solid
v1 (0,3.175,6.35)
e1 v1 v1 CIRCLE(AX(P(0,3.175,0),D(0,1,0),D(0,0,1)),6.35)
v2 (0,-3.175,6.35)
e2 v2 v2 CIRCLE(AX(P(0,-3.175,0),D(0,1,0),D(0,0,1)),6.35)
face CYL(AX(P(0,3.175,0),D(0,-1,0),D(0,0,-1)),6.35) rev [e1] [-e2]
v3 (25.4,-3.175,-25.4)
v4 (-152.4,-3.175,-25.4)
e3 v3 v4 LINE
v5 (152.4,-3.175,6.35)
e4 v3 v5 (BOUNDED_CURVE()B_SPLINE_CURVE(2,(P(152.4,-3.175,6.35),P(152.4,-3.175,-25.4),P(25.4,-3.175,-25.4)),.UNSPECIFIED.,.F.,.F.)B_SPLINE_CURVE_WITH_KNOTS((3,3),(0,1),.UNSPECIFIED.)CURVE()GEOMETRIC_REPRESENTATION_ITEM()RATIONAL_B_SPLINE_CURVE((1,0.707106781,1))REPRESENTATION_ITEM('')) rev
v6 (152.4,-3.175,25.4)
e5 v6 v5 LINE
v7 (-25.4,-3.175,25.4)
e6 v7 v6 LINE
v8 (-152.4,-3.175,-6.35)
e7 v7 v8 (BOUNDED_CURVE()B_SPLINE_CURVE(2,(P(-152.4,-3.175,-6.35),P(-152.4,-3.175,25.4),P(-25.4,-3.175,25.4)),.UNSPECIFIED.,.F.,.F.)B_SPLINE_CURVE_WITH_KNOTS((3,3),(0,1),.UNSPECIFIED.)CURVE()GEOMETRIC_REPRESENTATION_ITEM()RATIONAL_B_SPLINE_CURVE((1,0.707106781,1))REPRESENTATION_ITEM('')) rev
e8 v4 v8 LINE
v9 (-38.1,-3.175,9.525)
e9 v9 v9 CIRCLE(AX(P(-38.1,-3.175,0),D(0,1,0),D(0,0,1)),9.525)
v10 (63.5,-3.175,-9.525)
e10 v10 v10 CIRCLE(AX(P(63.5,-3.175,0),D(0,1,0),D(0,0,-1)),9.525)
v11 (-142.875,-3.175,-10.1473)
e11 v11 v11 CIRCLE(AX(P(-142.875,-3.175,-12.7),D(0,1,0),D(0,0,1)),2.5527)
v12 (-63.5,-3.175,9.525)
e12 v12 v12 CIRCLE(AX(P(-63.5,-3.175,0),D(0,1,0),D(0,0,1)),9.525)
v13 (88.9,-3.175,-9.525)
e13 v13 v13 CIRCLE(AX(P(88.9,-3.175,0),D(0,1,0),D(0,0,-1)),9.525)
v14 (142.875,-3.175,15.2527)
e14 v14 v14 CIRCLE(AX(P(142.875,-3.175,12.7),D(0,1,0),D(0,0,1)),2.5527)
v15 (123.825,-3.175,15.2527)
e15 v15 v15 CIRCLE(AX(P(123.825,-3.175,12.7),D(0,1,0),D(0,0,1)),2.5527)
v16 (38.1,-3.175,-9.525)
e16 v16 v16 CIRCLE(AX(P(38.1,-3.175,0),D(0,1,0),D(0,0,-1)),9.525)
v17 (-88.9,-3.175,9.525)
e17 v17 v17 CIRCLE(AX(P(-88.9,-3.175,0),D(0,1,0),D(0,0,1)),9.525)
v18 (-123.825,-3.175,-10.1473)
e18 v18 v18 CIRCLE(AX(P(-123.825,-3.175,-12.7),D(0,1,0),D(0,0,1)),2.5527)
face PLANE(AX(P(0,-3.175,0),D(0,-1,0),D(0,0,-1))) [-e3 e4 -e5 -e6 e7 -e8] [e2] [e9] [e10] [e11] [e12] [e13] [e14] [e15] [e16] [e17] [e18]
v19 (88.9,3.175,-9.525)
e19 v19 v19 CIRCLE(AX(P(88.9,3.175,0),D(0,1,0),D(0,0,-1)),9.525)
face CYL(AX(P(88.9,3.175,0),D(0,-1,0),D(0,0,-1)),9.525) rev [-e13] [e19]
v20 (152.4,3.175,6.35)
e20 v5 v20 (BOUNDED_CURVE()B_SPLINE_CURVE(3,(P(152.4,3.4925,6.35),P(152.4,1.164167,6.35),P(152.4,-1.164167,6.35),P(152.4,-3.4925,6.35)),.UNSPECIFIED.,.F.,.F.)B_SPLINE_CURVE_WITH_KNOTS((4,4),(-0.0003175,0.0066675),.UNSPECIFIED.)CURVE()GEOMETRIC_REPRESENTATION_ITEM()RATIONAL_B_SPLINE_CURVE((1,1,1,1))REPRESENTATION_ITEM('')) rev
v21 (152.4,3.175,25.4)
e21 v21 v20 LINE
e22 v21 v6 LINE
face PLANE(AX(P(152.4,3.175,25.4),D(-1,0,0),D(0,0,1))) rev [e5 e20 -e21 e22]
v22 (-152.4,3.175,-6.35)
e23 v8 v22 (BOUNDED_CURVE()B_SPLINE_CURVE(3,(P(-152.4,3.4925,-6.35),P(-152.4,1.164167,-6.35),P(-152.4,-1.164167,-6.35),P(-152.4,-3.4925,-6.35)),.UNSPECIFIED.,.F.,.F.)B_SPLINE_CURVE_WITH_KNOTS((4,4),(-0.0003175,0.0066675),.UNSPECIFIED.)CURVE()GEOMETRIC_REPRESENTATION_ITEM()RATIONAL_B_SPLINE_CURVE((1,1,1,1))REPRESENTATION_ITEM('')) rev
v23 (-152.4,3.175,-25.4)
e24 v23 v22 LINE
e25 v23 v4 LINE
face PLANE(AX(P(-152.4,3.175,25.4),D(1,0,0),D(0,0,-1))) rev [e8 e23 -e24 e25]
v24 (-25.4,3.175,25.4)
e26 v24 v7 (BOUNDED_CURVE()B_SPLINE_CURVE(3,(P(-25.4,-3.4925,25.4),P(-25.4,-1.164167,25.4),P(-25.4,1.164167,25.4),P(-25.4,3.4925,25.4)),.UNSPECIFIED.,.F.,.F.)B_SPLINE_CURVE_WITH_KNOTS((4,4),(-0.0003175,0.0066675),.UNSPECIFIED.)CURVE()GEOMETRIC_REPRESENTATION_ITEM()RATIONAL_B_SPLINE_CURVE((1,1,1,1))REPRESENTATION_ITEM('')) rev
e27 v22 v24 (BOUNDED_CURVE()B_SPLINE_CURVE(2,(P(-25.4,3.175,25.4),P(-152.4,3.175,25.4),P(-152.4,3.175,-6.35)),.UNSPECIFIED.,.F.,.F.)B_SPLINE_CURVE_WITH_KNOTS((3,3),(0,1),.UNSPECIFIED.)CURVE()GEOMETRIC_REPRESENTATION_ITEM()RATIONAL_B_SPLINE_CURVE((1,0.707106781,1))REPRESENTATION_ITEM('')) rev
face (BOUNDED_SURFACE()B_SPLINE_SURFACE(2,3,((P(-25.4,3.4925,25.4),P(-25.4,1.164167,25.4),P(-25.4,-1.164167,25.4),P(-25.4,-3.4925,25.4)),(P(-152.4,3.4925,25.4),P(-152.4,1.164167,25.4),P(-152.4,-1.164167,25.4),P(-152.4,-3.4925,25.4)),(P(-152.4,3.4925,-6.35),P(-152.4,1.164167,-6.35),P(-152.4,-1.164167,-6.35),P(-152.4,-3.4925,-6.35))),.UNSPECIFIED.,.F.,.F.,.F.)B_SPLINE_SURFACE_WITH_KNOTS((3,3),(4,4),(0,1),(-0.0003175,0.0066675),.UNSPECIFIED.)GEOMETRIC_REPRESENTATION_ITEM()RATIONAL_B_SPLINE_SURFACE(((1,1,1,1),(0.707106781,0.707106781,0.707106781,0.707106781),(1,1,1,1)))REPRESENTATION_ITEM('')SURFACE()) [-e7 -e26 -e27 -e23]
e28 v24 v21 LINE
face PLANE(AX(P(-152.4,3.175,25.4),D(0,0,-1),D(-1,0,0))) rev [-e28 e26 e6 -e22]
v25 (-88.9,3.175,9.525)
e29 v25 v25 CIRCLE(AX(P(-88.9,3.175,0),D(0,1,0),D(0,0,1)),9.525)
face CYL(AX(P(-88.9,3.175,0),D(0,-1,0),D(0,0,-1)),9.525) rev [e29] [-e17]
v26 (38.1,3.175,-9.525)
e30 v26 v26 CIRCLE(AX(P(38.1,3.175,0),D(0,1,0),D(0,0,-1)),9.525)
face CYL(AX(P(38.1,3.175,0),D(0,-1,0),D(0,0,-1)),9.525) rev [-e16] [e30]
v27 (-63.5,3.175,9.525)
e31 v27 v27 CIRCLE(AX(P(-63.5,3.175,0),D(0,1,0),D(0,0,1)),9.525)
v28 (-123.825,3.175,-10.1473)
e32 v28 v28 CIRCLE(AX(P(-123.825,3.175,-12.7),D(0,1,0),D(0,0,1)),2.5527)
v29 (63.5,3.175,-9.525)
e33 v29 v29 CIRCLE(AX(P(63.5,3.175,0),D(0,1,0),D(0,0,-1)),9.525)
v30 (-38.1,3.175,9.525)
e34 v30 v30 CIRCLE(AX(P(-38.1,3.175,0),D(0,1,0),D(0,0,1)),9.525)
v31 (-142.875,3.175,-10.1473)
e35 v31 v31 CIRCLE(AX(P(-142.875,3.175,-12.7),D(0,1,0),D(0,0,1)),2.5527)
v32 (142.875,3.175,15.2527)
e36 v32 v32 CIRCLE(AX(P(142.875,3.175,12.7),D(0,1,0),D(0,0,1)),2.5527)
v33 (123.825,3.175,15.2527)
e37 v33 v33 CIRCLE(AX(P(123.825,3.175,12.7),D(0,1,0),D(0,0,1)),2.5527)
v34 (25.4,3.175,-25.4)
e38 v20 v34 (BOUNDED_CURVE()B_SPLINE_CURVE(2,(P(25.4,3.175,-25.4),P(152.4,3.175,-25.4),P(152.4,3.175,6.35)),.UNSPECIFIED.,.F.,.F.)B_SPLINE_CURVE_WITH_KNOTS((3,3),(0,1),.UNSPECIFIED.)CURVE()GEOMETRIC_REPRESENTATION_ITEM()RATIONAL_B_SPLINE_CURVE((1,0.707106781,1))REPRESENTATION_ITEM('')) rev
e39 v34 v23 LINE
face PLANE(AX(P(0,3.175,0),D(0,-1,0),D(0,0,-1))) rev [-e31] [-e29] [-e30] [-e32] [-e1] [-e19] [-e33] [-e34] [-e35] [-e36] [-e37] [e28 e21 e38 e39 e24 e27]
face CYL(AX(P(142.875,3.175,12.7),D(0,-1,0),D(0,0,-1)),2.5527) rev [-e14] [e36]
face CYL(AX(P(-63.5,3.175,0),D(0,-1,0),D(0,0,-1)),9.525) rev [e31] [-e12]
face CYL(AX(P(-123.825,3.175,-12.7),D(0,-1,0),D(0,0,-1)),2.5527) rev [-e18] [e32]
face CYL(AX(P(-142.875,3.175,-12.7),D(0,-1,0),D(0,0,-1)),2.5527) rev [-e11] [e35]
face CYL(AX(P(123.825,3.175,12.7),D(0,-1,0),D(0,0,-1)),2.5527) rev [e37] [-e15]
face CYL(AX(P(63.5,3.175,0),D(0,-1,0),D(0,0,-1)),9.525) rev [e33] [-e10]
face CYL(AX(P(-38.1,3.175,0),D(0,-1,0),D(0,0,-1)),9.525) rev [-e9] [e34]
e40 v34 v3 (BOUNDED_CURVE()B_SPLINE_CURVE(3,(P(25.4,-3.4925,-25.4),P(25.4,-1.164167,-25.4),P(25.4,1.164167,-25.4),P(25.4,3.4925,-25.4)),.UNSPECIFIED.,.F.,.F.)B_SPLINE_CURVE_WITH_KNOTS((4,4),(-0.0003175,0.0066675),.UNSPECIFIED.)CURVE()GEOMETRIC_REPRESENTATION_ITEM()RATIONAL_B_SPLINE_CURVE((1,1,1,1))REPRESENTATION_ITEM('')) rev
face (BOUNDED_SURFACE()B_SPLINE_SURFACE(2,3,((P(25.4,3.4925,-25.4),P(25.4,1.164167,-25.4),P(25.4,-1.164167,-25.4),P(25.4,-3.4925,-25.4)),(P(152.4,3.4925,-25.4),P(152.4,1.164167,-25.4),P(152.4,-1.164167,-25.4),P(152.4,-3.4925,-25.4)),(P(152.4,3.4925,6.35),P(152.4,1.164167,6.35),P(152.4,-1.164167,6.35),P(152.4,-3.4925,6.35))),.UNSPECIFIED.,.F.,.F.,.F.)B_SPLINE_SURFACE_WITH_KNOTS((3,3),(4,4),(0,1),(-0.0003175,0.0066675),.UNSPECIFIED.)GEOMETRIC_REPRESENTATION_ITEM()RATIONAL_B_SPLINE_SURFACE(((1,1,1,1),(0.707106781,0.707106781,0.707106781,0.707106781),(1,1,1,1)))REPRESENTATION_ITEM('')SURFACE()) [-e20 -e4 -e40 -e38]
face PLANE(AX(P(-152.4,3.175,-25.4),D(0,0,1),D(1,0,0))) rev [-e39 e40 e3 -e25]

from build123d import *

# Parameters (mm, degrees)
SKETCH2_W           = 304.8
SKETCH2_H           = 50.8
SKETCH2_R           = 6.35
SKETCH2_R_2         = 9.525
SKETCH2_R_3         = 2.5527
BOSS_EXTRUDE2_DEPTH = 3.175
FILLET1_SIZE        = 127
FILLET1_SIZE_2      = 31.75


with BuildPart() as part:
    # Sketch2 → Boss-Extrude2 (new, symmetric)
    with BuildSketch(Plane(origin=(0, 0, 0), x_dir=(1, 0, 0), z_dir=(0, 1, 0))):
        Rectangle(SKETCH2_W, SKETCH2_H)
        with Locations(Location((0, 0, 0), (0, 0, 270))):
            Circle(SKETCH2_R, mode=Mode.SUBTRACT)
        with Locations(Location((-38.1, 0, 0), (0, 0, 270))):
            Circle(SKETCH2_R_2, mode=Mode.SUBTRACT)
        with Locations(Location((-63.5, 0, 0), (0, 0, 270))):
            Circle(SKETCH2_R_2, mode=Mode.SUBTRACT)
        with Locations(Location((-88.9, 0, 0), (0, 0, 270))):
            Circle(SKETCH2_R_2, mode=Mode.SUBTRACT)
        with Locations(Location((38.1, 0, 0), (0, 0, 90))):
            Circle(SKETCH2_R_2, mode=Mode.SUBTRACT)
        with Locations(Location((63.5, 0, 0), (0, 0, 90))):
            Circle(SKETCH2_R_2, mode=Mode.SUBTRACT)
        with Locations(Location((88.9, 0, 0), (0, 0, 90))):
            Circle(SKETCH2_R_2, mode=Mode.SUBTRACT)
        with Locations(Location((142.875, -12.7, 0), (0, 0, 270))):
            Circle(SKETCH2_R_3, mode=Mode.SUBTRACT)
        with Locations(Location((123.825, -12.7, 0), (0, 0, 270))):
            Circle(SKETCH2_R_3, mode=Mode.SUBTRACT)
        with Locations(Location((-142.875, 12.7, 0), (0, 0, 270))):
            Circle(SKETCH2_R_3, mode=Mode.SUBTRACT)
        with Locations(Location((-123.825, 12.7, 0), (0, 0, 270))):
            Circle(SKETCH2_R_3, mode=Mode.SUBTRACT)
    extrude(amount=BOSS_EXTRUDE2_DEPTH, both=True)

    # Fillet1
    # an asymmetric fillet: 127, 31.75 mm, written as the material it takes off along each edge
    with BuildSketch(Plane(origin=(152.4, -320.675, -25.4), x_dir=(-1, 0, 0), z_dir=(0, 1, 0))) as fillet1_piece_1:
        with BuildLine():
            Bezier((FILLET1_SIZE, 0), (0, 0), (0, FILLET1_SIZE_2), weights=[1, 0.707106781, 1])
            Line((0, FILLET1_SIZE_2), (0, 0))
            Line((0, 0), (FILLET1_SIZE, 0))
        make_face()
    extrude(amount=641.35, mode=Mode.SUBTRACT)
    with BuildSketch(Plane(origin=(-152.4, 320.675, 25.4), x_dir=(1, 0, 0), z_dir=(0, -1, 0))) as fillet1_piece_2:
        with BuildLine():
            Bezier((FILLET1_SIZE, 0), (0, 0), (0, -FILLET1_SIZE_2), weights=[1, 0.707106781, 1])
            Line((0, -FILLET1_SIZE_2), (0, 0))
            Line((0, 0), (FILLET1_SIZE, 0))
        make_face()
    extrude(amount=641.35, mode=Mode.SUBTRACT)


solid = part.part
